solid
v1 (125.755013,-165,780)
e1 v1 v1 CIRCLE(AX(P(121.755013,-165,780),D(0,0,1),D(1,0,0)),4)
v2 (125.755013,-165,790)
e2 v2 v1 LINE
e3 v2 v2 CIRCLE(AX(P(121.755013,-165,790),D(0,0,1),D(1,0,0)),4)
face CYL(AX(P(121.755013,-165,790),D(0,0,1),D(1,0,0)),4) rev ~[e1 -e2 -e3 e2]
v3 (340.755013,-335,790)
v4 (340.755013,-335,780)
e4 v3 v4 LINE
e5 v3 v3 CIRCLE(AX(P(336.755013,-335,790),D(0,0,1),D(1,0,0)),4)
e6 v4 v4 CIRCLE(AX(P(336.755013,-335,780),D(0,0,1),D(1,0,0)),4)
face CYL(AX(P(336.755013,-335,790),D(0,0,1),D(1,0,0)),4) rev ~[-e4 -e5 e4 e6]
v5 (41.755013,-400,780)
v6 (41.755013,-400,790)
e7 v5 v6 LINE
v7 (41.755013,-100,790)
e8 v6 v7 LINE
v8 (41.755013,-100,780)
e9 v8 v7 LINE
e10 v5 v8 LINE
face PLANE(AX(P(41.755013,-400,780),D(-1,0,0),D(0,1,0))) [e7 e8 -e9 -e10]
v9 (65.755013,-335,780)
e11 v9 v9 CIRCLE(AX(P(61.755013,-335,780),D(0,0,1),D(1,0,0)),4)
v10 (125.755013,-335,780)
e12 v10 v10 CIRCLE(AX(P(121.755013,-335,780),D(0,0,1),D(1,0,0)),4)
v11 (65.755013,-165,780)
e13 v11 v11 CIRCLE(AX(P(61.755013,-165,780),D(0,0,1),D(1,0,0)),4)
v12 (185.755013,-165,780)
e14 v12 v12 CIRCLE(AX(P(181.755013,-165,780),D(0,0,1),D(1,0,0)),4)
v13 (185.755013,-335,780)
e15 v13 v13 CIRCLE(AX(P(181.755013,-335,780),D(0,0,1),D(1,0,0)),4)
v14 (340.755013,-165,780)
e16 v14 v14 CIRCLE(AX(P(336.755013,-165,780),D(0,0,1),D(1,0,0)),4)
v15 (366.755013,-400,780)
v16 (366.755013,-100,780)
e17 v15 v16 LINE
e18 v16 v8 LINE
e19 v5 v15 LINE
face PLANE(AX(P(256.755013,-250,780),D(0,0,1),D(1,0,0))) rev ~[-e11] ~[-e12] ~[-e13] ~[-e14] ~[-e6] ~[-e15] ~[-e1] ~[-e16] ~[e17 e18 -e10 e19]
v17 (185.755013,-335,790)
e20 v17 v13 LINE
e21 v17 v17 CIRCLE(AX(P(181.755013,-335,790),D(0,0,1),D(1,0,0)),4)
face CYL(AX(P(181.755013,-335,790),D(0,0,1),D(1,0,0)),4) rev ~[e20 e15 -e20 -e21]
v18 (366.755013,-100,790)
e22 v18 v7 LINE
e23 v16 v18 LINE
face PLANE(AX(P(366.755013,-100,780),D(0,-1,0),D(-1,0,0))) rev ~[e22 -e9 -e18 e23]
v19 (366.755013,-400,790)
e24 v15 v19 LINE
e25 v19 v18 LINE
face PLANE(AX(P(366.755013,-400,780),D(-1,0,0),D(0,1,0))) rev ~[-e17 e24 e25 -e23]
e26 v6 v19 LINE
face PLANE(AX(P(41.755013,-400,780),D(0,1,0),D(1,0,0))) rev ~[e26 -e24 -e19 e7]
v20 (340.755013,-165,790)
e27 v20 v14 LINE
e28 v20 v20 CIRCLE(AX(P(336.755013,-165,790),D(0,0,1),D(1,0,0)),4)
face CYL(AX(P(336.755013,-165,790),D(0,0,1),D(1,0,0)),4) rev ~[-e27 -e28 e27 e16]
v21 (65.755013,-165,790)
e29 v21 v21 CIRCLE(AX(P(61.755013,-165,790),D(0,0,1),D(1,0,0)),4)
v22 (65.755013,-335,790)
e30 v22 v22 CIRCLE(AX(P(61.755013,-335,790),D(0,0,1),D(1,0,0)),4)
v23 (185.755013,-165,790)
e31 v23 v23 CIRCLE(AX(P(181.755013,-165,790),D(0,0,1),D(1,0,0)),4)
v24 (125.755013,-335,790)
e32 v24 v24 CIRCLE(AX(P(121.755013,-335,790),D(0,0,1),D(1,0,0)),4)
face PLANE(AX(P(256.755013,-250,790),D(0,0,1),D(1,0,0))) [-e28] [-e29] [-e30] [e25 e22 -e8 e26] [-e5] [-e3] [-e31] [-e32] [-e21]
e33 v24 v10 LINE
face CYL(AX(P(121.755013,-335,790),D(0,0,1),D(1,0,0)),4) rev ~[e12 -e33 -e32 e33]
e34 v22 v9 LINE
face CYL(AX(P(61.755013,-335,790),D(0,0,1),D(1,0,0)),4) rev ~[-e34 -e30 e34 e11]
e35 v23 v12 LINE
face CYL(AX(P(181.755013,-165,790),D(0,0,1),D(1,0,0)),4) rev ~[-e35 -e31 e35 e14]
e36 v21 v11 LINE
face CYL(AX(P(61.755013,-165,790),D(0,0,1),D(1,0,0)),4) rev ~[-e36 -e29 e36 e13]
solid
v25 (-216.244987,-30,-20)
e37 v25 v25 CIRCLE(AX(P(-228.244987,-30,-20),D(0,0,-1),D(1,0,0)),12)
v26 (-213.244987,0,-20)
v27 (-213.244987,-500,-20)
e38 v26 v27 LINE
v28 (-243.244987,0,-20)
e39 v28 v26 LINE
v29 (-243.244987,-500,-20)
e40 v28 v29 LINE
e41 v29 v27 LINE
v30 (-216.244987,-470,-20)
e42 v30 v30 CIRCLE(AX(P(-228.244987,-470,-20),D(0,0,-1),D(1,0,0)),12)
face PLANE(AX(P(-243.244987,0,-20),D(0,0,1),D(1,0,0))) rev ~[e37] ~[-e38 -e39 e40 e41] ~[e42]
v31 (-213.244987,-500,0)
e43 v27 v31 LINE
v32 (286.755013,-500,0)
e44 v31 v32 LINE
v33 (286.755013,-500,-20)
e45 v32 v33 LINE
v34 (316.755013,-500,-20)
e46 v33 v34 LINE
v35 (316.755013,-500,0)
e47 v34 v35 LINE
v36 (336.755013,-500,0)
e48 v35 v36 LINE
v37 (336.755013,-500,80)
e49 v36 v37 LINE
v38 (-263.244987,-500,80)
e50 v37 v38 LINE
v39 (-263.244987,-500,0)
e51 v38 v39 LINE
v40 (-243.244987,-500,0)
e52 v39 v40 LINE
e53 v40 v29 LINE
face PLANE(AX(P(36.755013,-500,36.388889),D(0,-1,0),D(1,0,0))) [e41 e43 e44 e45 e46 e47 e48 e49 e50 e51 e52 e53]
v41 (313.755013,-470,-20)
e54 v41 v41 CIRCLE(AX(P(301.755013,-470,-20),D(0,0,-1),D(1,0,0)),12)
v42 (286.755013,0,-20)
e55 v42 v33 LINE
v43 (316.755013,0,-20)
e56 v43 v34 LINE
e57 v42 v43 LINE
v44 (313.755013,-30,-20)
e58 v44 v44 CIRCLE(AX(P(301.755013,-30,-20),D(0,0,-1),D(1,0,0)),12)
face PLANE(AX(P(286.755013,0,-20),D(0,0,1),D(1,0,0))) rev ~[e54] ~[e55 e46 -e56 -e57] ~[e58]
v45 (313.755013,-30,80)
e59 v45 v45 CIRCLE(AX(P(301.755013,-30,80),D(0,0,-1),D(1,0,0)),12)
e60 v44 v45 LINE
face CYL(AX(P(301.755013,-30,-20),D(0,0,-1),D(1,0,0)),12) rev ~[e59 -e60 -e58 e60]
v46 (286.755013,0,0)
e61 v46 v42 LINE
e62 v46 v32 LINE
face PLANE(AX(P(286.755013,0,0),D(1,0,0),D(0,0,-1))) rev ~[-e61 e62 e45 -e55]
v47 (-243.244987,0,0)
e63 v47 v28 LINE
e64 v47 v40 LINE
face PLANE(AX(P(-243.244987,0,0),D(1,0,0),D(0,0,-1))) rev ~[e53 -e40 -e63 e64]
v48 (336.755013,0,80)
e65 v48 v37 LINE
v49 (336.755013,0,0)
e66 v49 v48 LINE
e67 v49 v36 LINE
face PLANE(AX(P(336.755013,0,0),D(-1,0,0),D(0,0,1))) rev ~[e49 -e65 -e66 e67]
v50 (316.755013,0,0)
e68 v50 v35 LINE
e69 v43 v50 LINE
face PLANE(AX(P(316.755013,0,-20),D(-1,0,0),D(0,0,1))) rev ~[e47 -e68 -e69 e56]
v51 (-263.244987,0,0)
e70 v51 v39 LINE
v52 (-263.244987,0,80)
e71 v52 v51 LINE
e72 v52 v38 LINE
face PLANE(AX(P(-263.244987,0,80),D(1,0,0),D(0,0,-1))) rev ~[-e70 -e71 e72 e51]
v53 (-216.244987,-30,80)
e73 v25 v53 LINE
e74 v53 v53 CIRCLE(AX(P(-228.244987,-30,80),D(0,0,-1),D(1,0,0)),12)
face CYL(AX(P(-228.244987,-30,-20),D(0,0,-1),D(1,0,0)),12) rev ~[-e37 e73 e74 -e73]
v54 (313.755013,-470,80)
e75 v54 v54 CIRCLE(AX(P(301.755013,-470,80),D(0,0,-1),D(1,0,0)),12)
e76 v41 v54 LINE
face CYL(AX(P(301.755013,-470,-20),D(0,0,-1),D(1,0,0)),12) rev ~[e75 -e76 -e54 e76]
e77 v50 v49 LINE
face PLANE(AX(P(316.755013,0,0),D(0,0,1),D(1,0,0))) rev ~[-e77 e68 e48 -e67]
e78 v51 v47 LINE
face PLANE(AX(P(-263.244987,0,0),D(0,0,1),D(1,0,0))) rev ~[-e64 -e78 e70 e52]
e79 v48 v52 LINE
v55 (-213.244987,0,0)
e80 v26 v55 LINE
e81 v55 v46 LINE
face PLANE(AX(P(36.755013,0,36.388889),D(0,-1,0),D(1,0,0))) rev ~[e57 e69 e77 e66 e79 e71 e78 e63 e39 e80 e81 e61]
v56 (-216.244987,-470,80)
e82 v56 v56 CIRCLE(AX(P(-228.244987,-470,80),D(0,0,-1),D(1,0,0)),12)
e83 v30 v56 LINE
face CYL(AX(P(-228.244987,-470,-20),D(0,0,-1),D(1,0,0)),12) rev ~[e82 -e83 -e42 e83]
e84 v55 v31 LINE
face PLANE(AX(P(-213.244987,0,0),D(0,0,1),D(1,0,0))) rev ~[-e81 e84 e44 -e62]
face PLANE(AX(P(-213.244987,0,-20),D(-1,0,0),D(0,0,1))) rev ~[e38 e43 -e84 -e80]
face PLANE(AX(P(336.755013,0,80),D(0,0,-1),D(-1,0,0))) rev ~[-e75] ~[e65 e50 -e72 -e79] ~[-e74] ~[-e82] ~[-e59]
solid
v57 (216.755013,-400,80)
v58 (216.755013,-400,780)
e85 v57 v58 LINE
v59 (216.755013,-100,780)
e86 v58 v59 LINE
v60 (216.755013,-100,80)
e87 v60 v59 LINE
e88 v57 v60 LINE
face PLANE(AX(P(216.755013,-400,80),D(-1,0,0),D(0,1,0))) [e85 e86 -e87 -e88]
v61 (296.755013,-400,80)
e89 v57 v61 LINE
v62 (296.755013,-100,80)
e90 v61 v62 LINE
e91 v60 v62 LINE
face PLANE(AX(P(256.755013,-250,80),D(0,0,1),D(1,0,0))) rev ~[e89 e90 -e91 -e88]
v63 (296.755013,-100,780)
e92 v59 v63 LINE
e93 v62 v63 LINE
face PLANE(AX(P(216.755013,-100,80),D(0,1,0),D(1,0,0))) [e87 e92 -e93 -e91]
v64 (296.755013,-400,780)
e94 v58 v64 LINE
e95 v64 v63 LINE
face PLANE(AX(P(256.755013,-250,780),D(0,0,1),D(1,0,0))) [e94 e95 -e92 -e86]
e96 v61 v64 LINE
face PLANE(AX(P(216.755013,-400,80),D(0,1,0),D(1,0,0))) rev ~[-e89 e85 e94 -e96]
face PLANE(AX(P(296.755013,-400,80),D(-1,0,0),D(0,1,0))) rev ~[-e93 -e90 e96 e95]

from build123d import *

# Parameters (mm, degrees)
F1_DEPTH  = 500
F4_R      = 12
F3_R      = 12
F5_DEPTH  = 100.001
F2_W      = 80
F2_H      = 300
F6_DEPTH  = 700
F7_W      = 80
F7_H      = 300
F7_W_2    = 175
F7_W_3    = 70
F8_DEPTH  = 10
F9_R      = 4
F10_DEPTH = 10


with BuildPart() as f1:
    # F0 (on Front) → F1 (new body)
    with BuildSketch(Plane.XZ):
        Polygon((336.7550126589, 80), (-263.2449873411, 80), (-263.2449873411, 0), (-243.2449873411, 0), (-243.2449873411, -20), (-213.2449873411, -20), (-213.2449873411, 0), (286.7550126589, 0), (286.7550126589, -20), (316.7550126589, -20), (316.7550126589, 0), (336.7550126589, 0), align=None)
    extrude(amount=F1_DEPTH)

    # F4 (on face) + F3 (on face) → F5 (cut, through all)
    with BuildSketch(Plane(origin=(0, 0, -20), x_dir=(1, 0, 0), z_dir=(0, 0, -1))):
        with Locations((301.7550126589, 470)):
            Circle(F4_R)
        with Locations((301.7550126589, 30)):
            Circle(F4_R)
    with BuildSketch(Plane(origin=(0, 0, -20), x_dir=(1, 0, 0), z_dir=(0, 0, -1))):
        with Locations((-228.2449873411, 30)):
            Circle(F3_R)
        with Locations((-228.2449873411, 470)):
            Circle(F3_R)
    extrude(amount=-F5_DEPTH, mode=Mode.SUBTRACT)


with BuildPart() as f6:
    # F2 (on face) → F6 (new body)
    with BuildSketch(Plane.XY.offset(80)):
        with Locations((256.7550126589, -250)):
            Rectangle(F2_W, F2_H)
    extrude(amount=F6_DEPTH)


with BuildPart() as f8:
    # F7 (on face) → F8 (new body)
    with BuildSketch(Plane.XY.offset(780)):
        with Locations((256.7550126589, -250)):
            Rectangle(F7_W, F7_H)
        with Locations((129.2550126589, -250)):
            Rectangle(F7_W_2, F7_H)
        with Locations((331.7550126589, -250)):
            Rectangle(F7_W_3, F7_H)
    extrude(amount=F8_DEPTH)

    # F9 (on face) → F10 (cut)
    with BuildSketch(Plane.XY.offset(790)):
        with Locations((121.7550126589, -335)):
            Circle(F9_R)
        with Locations((61.7550126589, -335)):
            Circle(F9_R)
        with Locations((181.7550126589, -335)):
            Circle(F9_R)
        with Locations((336.7550126589, -335)):
            Circle(F9_R)
        with Locations((336.7550126589, -165)):
            Circle(F9_R)
        with Locations((181.7550126589, -165)):
            Circle(F9_R)
        with Locations((121.7550126589, -165)):
            Circle(F9_R)
        with Locations((61.7550126589, -165)):
            Circle(F9_R)
    extrude(amount=-F10_DEPTH, mode=Mode.SUBTRACT)


solid = Compound([f1.part, f6.part, f8.part])
